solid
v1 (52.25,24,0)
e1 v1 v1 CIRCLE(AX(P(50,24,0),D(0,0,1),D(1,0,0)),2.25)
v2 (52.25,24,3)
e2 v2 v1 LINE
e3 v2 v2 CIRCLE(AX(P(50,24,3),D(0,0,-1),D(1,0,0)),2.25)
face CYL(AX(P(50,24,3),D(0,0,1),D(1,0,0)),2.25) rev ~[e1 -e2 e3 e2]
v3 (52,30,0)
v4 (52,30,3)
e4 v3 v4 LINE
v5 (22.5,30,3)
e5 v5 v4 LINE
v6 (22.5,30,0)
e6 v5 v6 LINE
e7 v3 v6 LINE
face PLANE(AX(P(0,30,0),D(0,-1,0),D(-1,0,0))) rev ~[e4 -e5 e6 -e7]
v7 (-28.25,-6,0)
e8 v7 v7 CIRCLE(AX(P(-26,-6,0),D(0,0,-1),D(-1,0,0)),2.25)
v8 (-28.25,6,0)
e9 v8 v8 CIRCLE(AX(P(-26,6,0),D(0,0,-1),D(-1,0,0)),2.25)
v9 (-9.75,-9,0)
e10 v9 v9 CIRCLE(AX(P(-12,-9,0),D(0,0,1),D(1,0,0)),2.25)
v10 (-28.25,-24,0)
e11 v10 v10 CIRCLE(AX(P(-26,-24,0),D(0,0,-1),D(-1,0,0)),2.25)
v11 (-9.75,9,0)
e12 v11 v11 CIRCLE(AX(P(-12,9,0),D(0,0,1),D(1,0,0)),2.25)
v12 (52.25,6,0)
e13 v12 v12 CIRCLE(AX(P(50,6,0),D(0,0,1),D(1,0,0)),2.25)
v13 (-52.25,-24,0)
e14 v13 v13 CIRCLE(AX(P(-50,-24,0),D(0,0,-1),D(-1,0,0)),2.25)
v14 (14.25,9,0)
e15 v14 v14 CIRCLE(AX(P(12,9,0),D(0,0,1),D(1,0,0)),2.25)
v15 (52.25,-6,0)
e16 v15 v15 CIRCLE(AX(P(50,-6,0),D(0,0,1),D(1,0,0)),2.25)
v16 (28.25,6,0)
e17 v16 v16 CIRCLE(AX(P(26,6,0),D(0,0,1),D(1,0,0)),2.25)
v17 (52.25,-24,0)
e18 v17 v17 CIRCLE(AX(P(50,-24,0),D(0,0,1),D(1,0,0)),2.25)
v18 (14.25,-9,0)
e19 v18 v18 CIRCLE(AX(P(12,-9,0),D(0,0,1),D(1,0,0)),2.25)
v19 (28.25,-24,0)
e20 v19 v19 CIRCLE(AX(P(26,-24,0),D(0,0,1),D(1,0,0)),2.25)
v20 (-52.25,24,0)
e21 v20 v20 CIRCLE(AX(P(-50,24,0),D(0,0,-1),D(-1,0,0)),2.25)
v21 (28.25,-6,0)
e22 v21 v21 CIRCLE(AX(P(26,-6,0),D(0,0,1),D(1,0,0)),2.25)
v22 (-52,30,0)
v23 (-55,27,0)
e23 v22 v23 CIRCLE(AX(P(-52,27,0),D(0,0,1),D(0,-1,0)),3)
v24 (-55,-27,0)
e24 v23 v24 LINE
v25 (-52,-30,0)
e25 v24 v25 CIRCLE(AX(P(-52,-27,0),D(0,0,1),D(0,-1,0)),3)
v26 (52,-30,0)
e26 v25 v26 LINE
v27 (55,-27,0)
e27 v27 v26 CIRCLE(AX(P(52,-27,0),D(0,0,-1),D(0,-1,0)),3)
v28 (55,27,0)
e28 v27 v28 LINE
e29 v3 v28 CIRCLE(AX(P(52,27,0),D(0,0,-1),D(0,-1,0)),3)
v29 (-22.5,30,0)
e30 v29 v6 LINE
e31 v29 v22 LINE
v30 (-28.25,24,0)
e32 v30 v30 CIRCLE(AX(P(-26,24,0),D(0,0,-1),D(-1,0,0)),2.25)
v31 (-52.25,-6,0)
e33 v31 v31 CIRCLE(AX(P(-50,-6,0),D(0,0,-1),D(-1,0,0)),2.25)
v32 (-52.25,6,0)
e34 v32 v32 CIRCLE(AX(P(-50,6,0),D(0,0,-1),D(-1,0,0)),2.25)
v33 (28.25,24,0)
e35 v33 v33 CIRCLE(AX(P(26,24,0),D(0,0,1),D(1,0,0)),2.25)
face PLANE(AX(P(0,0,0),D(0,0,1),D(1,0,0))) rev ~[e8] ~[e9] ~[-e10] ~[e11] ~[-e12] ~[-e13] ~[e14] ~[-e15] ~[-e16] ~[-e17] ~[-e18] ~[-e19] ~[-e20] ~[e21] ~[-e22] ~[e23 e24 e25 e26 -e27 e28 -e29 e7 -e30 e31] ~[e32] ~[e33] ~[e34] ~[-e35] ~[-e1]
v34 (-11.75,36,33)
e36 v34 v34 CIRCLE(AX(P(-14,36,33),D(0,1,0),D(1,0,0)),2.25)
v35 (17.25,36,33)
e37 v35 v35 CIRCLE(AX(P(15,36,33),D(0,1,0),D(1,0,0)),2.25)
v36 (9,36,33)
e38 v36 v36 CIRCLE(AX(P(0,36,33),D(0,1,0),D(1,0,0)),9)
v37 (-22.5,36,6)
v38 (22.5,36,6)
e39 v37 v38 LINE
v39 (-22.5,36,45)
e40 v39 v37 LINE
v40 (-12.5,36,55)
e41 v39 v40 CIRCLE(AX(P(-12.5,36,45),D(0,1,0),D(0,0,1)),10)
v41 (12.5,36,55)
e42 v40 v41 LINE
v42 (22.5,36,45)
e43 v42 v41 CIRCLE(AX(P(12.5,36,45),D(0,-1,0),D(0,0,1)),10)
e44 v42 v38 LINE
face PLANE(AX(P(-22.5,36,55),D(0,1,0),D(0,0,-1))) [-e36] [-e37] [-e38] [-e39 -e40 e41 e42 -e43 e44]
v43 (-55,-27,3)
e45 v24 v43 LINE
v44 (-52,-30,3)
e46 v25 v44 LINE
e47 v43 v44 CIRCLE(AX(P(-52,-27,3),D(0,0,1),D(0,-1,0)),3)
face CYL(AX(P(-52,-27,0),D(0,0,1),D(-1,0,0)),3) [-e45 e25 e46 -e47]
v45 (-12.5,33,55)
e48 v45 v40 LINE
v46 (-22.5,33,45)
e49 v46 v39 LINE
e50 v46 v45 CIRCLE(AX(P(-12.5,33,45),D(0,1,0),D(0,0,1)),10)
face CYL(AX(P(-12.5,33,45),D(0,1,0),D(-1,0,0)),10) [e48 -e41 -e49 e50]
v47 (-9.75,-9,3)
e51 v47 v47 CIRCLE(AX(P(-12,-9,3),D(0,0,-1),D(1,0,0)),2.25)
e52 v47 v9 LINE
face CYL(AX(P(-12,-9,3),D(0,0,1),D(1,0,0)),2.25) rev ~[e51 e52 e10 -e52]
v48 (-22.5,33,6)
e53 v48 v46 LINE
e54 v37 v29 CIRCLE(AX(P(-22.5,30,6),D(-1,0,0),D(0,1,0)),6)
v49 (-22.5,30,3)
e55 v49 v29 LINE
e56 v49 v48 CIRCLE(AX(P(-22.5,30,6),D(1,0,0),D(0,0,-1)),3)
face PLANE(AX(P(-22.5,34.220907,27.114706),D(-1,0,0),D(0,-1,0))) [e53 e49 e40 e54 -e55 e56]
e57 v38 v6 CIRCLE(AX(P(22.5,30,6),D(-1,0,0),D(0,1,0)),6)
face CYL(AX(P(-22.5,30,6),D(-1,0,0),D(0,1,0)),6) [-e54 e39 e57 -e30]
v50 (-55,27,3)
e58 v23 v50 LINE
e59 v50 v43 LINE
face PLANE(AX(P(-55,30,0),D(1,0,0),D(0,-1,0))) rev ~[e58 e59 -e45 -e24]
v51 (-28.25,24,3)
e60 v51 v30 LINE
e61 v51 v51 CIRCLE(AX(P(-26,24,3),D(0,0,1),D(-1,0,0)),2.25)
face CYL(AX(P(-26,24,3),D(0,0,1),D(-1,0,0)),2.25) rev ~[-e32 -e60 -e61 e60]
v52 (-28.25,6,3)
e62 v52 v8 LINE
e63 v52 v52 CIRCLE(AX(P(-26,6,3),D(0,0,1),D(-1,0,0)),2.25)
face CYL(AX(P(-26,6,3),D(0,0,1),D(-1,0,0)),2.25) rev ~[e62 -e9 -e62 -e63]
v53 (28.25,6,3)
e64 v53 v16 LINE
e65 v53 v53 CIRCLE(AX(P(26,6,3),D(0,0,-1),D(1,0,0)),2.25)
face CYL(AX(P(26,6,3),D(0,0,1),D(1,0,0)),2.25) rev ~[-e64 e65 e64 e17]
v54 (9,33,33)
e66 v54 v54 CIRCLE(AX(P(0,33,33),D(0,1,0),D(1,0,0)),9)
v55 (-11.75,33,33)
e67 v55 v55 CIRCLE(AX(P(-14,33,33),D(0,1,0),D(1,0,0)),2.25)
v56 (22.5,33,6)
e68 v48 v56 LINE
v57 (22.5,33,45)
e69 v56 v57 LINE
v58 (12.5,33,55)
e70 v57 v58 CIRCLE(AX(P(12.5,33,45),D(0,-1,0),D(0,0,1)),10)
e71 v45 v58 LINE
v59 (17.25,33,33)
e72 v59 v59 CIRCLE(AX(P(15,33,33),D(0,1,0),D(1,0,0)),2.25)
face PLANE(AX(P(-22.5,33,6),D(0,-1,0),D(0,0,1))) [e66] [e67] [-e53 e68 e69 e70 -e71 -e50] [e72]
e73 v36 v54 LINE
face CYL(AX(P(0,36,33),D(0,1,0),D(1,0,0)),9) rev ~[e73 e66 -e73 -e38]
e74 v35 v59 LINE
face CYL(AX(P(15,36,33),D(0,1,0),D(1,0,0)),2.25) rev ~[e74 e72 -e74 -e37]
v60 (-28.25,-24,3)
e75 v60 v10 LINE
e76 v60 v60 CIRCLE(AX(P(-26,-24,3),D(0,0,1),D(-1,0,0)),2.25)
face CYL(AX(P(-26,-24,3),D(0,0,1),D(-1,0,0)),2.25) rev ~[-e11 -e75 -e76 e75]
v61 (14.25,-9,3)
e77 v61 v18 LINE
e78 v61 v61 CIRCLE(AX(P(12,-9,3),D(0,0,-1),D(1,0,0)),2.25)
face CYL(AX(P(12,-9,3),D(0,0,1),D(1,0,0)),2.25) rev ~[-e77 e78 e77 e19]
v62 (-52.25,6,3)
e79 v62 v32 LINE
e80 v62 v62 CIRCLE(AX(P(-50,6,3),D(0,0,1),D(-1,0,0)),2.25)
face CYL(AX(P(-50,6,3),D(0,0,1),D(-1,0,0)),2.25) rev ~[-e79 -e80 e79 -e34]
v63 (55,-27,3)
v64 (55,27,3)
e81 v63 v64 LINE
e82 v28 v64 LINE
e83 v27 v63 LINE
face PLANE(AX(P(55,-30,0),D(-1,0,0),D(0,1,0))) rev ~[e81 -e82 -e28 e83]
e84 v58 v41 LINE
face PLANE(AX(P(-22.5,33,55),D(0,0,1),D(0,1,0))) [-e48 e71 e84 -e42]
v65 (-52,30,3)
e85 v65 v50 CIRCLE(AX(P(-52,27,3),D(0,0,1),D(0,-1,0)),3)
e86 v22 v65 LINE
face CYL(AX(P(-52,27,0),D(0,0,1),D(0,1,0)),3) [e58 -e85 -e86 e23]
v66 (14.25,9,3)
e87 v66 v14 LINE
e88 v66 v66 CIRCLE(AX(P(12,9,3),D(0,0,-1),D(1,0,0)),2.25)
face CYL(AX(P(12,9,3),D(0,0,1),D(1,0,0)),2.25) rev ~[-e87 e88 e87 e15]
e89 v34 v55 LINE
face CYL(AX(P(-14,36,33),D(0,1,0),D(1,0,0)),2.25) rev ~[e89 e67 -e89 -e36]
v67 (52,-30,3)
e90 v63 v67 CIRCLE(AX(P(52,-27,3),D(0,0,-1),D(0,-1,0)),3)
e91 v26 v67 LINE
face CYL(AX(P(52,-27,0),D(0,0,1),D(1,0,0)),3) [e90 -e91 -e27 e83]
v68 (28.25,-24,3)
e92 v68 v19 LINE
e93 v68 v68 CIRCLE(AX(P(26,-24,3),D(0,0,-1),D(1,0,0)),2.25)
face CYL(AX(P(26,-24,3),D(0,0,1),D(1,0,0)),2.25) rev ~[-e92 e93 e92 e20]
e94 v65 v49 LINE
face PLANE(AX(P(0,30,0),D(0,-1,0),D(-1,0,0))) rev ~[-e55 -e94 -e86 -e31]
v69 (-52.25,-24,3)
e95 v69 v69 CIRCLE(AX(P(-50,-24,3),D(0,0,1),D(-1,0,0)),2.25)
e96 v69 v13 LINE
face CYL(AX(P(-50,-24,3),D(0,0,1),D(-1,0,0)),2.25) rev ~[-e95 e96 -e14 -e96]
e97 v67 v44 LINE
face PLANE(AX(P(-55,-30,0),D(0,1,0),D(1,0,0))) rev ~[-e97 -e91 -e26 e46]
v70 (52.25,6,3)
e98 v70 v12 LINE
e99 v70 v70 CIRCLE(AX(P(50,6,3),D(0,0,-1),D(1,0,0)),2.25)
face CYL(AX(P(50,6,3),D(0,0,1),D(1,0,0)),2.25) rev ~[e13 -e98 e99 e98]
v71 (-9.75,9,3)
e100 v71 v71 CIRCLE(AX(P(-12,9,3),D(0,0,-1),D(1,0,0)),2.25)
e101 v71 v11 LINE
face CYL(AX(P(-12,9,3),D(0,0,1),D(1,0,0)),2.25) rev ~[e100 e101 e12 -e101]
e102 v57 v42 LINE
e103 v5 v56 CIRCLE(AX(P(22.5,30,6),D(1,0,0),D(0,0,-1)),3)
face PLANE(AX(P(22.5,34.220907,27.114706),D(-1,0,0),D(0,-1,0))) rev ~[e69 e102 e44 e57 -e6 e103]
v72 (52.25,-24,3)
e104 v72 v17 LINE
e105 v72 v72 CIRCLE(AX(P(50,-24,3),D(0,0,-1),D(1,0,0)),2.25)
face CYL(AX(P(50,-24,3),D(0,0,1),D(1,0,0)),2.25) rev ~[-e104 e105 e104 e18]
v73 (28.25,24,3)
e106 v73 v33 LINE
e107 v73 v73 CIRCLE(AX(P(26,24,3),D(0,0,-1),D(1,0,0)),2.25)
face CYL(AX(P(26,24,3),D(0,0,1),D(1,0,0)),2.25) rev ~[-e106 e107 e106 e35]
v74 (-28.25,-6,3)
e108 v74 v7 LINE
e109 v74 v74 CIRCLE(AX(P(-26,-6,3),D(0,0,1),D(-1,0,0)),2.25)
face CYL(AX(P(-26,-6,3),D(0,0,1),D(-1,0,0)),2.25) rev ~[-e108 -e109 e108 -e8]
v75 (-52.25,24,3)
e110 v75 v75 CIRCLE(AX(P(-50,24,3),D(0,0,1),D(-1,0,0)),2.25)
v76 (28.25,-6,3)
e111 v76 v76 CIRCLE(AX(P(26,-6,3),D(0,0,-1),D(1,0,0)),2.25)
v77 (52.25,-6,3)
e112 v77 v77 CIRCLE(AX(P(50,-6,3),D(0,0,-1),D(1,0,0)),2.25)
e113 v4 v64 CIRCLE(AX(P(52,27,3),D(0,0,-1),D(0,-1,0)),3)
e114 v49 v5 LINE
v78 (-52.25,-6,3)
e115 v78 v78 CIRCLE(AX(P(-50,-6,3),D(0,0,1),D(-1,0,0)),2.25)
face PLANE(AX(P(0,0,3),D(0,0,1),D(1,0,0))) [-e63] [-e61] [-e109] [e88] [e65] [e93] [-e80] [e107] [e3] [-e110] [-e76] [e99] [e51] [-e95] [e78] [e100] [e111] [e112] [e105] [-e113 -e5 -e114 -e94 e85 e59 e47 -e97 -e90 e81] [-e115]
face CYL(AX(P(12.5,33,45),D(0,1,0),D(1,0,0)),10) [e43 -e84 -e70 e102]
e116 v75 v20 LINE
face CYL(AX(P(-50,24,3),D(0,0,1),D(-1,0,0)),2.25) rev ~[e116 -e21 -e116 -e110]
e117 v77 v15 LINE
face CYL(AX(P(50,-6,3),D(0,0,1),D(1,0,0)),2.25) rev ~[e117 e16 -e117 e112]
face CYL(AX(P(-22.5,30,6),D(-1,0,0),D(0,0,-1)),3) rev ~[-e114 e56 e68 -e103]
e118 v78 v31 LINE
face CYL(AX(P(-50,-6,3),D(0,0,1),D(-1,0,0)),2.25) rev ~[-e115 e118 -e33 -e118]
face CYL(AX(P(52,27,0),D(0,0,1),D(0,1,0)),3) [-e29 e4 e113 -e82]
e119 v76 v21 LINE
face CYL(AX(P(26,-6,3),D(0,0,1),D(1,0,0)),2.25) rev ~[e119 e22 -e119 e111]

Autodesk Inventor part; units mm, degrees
ref_plane "YZ Plane" through (0, 0, 0) normal (1, 0, 0) x (0, 1, 0)
ref_plane "XZ Plane" through (0, 0, 0) normal (0, 1, 0) x (-1, 0, 0)
ref_plane "XY Plane" through (0, 0, 0) normal (0, 0, 1) x (1, 0, 0)
sketch "Sketch1" plane through (0, 0, 0) normal (0, 0, 1) x (1, 0, 0)
  line L0 (-55, -30) -> (55, -30)
  line L1 (55, -30) -> (55, 30)
  line L2 (55, 30) -> (-55, 30)
  line L3 (-55, 30) -> (-55, -30)
  line L4 (-55, -30) -> (55, 30) construction
  line L5 (55, -30) -> (-55, 30) construction
  line L6 (0, -42) -> (0, 42)
  point P0 (0, 0)
  dimension "d1" = 110
  dimension "d2" = 60
  dimension "d60" = 0
extrude "Plate1" add sketch "Sketch1" along normal blind 3
sketch "Sketch2" plane through (0, 0, 3) normal (0, 0, 1) x (1, 0, 0)
  line L0 (26, -24) -> (50, -24)
  line L1 (50, -24) -> (50, -6)
  line L2 (50, -6) -> (26, -6)
  line L3 (26, -6) -> (26, -24)
  line L4 (26, -24) -> (50, -6) construction
  line L5 (50, -24) -> (26, -6) construction
  circle A0 centre (50, -6) radius 2.25
  circle A1 centre (50, -24) radius 2.25
  circle A2 centre (26, -24) radius 2.25
  circle A3 centre (26, -6) radius 2.25
  line L6 (55, 30) -> (55, -30) projected
  line L7 (55, -30) -> (-55, -30) projected
  point P0 (0, 0)
  point P1 (0, 0)
  point P2 (38, -15)
  dimension "d4" = 24
  dimension "d5" = 18
  dimension "d8" = 4.5
  dimension "d9" = 4.5
  dimension "d10" = 4.5
  dimension "d11" = 4.5
  dimension "d12" = 5
  dimension "d13" = 15
extrude "Cut1" cut sketch "Sketch2" against normal blind 3 contours L3 A2 L0 | L0 A2 L3 | A1 L1 L0 | L0 L1 A1 | A3 L2 L3 | L3 L2 A3 | A0 L2 L1 | L1 L2 A0
pattern_linear "Rectangular Pattern1" count 2 spacing 30 along (0, 1, 0) of "Cut1"
mirror "Mirror1" about plane through (0, 0, 0) normal (1, 0, 0) of "Cut1", "Rectangular Pattern1"
sketch "Sketch3" plane through (0, 0, 3) normal (0, 0, 1) x (1, 0, 0)
  line L0 (-12, -9) -> (12, -9)
  line L1 (12, -9) -> (12, 9)
  line L2 (12, 9) -> (-12, 9)
  line L3 (-12, 9) -> (-12, -9)
  line L4 (-12, -9) -> (12, 9) construction
  line L5 (12, -9) -> (-12, 9) construction
  circle A0 centre (-12, 9) radius 2.25
  circle A1 centre (12, 9) radius 2.25
  circle A2 centre (12, -9) radius 2.25
  circle A3 centre (-12, -9) radius 2.25
  line L6 (-77, 0) -> (77, 0) projected
  line L7 (0, -42) -> (0, 42) projected
  point P0 (0, 0)
  dimension "d20" = 24
  dimension "d21" = 18
  dimension "d22" = 4.5
  dimension "d23" = 4.5
  dimension "d24" = 4.5
  dimension "d25" = 4.5
  dimension "d26" = 12
  dimension "d27" = 9
extrude "Cut2" cut sketch "Sketch3" against normal blind 3 contours L3 A3 L0 | L0 A3 L3 | A2 L1 L0 | L0 L1 A2 | A0 L2 L3 | L3 L2 A0 | A1 L2 L1 | L1 L2 A1
sketch "Sketch4" plane through (0, 0, 3) normal (0, 0, 1) x (1, 0, 0)
  line L0 (-55, 30) -> (55, 30)
  line L1 (-22.5, 30) -> (22.5, 30)
  line L2 (22.5, 30) -> (22.5, 33)
  line L3 (22.5, 33) -> (-22.5, 33)
  line L4 (-22.5, 33) -> (-22.5, 30)
  point P0 (0, 0)
  point P1 (-50, 30)
  point P2 (50, 30)
  dimension "d30" = 45
  dimension "d31" = 3
  dimension "d32" = 22.5
sheet face with bend "Face2" sketch "Sketch4" thickness 3 toward (0, 0, -1) bend radius 3
bend "Bend1"
sketch "Sketch5" plane through (-22.5, 33, 3) normal (0, 1, 0) x (-1, 0, 0)
  line L0 (-45, 0) -> (0, 0)
  line L1 (0, 0) -> (0, 52)
  line L2 (0, 52) -> (-45, 52)
  line L3 (-45, 52) -> (-45, 0)
edge flange "Flange1" height 55 angle 90 thickness 3 bend radius 3 thickness toward (0, 1, 0) relief tear relief width 3 relief depth 1.5 edges at (0, 33, 3) wall of the first edge with corners at (22.5, 33, 3) (-22.5, 33, 3) (-22.5, 33, 55) (22.5, 33, 55)
bend "Bend2"
corner "Corner1"
sketch "Sketch6" plane through (-22.5, 36, 55) normal (0, 1, 0) x (1, 0, 0)
  circle A0 centre (22.5, 22) radius 9
  line L0 (0, 55) -> (45, 55) projected
  circle A1 centre (37.5, 22) radius 2.25
  circle A2 centre (8.5, 22) radius 2.25
  line L1 (45, 49) -> (45, 0) projected
  line L2 (45, 55) -> (0, 55) projected
  point P0 (22.5, 55)
  point P1 (-25, 55)
  dimension "d48" = 18
  dimension "d49" = 33
  dimension "d50" = 4.5
  dimension "d51" = 4.5
  dimension "d52" = 29
  dimension "d53" = 22.5
  dimension "d54" = 15
  dimension "d55" = 33
  dimension "d56" = 33
extrude "Cut3" cut sketch "Sketch6" against normal blind 3
fillet "Fillet2" radius 10 2 edges at (22.5, 34.5, 55) (-22.5, 34.5, 55)
fillet "Fillet4" radius 3 4 edges at (55, 30, 1.5) (55, -30, 1.5) (-55, -30, 1.5) (-55, 30, 1.5)
equation "\"d14\" = Thickness"
equation "\"d28\" = Thickness"
equation "\"d57\" = Thickness"
equation "\"d3\" = Thickness"
equation "\"d33\" = BendRadius"
equation "\"d34\" = BendReliefWidth"
equation "\"d36\" = MinimumRemnant"
equation "\"d35\" = BendReliefDepth"
equation "\"d37\" = TransitionRadius"
equation "\"d38\" = BendReliefWidth"
equation "\"d39\" = BendReliefDepth"
equation "\"d40\" = MinimumRemnant"
equation "\"d41\" = TransitionRadius"
equation "\"d44\" = BendRadius"
equation "\"d45\" = CornerReliefSize"
equation "\"d46\" = GapSize"
equation "\"d47\" = JacobiRadiusSize"
equation "\"BendRadius\" = Thickness"
equation "\"BendReliefWidth\" = Thickness"
equation "\"BendReliefDepth\" = 0.5 * Thickness"
equation "\"CornerReliefSize\" = 4 * Thickness"
equation "\"MinimumRemnant\" = 2 * Thickness"
equation "\"TransitionRadius\" = BendRadius"
equation "\"JacobiRadiusSize\" = BendRadius"
equation "\"GapSize\" = Thickness"
equation "\"Thickness\" = 3"
properties part number "De truc Z chan sat"
